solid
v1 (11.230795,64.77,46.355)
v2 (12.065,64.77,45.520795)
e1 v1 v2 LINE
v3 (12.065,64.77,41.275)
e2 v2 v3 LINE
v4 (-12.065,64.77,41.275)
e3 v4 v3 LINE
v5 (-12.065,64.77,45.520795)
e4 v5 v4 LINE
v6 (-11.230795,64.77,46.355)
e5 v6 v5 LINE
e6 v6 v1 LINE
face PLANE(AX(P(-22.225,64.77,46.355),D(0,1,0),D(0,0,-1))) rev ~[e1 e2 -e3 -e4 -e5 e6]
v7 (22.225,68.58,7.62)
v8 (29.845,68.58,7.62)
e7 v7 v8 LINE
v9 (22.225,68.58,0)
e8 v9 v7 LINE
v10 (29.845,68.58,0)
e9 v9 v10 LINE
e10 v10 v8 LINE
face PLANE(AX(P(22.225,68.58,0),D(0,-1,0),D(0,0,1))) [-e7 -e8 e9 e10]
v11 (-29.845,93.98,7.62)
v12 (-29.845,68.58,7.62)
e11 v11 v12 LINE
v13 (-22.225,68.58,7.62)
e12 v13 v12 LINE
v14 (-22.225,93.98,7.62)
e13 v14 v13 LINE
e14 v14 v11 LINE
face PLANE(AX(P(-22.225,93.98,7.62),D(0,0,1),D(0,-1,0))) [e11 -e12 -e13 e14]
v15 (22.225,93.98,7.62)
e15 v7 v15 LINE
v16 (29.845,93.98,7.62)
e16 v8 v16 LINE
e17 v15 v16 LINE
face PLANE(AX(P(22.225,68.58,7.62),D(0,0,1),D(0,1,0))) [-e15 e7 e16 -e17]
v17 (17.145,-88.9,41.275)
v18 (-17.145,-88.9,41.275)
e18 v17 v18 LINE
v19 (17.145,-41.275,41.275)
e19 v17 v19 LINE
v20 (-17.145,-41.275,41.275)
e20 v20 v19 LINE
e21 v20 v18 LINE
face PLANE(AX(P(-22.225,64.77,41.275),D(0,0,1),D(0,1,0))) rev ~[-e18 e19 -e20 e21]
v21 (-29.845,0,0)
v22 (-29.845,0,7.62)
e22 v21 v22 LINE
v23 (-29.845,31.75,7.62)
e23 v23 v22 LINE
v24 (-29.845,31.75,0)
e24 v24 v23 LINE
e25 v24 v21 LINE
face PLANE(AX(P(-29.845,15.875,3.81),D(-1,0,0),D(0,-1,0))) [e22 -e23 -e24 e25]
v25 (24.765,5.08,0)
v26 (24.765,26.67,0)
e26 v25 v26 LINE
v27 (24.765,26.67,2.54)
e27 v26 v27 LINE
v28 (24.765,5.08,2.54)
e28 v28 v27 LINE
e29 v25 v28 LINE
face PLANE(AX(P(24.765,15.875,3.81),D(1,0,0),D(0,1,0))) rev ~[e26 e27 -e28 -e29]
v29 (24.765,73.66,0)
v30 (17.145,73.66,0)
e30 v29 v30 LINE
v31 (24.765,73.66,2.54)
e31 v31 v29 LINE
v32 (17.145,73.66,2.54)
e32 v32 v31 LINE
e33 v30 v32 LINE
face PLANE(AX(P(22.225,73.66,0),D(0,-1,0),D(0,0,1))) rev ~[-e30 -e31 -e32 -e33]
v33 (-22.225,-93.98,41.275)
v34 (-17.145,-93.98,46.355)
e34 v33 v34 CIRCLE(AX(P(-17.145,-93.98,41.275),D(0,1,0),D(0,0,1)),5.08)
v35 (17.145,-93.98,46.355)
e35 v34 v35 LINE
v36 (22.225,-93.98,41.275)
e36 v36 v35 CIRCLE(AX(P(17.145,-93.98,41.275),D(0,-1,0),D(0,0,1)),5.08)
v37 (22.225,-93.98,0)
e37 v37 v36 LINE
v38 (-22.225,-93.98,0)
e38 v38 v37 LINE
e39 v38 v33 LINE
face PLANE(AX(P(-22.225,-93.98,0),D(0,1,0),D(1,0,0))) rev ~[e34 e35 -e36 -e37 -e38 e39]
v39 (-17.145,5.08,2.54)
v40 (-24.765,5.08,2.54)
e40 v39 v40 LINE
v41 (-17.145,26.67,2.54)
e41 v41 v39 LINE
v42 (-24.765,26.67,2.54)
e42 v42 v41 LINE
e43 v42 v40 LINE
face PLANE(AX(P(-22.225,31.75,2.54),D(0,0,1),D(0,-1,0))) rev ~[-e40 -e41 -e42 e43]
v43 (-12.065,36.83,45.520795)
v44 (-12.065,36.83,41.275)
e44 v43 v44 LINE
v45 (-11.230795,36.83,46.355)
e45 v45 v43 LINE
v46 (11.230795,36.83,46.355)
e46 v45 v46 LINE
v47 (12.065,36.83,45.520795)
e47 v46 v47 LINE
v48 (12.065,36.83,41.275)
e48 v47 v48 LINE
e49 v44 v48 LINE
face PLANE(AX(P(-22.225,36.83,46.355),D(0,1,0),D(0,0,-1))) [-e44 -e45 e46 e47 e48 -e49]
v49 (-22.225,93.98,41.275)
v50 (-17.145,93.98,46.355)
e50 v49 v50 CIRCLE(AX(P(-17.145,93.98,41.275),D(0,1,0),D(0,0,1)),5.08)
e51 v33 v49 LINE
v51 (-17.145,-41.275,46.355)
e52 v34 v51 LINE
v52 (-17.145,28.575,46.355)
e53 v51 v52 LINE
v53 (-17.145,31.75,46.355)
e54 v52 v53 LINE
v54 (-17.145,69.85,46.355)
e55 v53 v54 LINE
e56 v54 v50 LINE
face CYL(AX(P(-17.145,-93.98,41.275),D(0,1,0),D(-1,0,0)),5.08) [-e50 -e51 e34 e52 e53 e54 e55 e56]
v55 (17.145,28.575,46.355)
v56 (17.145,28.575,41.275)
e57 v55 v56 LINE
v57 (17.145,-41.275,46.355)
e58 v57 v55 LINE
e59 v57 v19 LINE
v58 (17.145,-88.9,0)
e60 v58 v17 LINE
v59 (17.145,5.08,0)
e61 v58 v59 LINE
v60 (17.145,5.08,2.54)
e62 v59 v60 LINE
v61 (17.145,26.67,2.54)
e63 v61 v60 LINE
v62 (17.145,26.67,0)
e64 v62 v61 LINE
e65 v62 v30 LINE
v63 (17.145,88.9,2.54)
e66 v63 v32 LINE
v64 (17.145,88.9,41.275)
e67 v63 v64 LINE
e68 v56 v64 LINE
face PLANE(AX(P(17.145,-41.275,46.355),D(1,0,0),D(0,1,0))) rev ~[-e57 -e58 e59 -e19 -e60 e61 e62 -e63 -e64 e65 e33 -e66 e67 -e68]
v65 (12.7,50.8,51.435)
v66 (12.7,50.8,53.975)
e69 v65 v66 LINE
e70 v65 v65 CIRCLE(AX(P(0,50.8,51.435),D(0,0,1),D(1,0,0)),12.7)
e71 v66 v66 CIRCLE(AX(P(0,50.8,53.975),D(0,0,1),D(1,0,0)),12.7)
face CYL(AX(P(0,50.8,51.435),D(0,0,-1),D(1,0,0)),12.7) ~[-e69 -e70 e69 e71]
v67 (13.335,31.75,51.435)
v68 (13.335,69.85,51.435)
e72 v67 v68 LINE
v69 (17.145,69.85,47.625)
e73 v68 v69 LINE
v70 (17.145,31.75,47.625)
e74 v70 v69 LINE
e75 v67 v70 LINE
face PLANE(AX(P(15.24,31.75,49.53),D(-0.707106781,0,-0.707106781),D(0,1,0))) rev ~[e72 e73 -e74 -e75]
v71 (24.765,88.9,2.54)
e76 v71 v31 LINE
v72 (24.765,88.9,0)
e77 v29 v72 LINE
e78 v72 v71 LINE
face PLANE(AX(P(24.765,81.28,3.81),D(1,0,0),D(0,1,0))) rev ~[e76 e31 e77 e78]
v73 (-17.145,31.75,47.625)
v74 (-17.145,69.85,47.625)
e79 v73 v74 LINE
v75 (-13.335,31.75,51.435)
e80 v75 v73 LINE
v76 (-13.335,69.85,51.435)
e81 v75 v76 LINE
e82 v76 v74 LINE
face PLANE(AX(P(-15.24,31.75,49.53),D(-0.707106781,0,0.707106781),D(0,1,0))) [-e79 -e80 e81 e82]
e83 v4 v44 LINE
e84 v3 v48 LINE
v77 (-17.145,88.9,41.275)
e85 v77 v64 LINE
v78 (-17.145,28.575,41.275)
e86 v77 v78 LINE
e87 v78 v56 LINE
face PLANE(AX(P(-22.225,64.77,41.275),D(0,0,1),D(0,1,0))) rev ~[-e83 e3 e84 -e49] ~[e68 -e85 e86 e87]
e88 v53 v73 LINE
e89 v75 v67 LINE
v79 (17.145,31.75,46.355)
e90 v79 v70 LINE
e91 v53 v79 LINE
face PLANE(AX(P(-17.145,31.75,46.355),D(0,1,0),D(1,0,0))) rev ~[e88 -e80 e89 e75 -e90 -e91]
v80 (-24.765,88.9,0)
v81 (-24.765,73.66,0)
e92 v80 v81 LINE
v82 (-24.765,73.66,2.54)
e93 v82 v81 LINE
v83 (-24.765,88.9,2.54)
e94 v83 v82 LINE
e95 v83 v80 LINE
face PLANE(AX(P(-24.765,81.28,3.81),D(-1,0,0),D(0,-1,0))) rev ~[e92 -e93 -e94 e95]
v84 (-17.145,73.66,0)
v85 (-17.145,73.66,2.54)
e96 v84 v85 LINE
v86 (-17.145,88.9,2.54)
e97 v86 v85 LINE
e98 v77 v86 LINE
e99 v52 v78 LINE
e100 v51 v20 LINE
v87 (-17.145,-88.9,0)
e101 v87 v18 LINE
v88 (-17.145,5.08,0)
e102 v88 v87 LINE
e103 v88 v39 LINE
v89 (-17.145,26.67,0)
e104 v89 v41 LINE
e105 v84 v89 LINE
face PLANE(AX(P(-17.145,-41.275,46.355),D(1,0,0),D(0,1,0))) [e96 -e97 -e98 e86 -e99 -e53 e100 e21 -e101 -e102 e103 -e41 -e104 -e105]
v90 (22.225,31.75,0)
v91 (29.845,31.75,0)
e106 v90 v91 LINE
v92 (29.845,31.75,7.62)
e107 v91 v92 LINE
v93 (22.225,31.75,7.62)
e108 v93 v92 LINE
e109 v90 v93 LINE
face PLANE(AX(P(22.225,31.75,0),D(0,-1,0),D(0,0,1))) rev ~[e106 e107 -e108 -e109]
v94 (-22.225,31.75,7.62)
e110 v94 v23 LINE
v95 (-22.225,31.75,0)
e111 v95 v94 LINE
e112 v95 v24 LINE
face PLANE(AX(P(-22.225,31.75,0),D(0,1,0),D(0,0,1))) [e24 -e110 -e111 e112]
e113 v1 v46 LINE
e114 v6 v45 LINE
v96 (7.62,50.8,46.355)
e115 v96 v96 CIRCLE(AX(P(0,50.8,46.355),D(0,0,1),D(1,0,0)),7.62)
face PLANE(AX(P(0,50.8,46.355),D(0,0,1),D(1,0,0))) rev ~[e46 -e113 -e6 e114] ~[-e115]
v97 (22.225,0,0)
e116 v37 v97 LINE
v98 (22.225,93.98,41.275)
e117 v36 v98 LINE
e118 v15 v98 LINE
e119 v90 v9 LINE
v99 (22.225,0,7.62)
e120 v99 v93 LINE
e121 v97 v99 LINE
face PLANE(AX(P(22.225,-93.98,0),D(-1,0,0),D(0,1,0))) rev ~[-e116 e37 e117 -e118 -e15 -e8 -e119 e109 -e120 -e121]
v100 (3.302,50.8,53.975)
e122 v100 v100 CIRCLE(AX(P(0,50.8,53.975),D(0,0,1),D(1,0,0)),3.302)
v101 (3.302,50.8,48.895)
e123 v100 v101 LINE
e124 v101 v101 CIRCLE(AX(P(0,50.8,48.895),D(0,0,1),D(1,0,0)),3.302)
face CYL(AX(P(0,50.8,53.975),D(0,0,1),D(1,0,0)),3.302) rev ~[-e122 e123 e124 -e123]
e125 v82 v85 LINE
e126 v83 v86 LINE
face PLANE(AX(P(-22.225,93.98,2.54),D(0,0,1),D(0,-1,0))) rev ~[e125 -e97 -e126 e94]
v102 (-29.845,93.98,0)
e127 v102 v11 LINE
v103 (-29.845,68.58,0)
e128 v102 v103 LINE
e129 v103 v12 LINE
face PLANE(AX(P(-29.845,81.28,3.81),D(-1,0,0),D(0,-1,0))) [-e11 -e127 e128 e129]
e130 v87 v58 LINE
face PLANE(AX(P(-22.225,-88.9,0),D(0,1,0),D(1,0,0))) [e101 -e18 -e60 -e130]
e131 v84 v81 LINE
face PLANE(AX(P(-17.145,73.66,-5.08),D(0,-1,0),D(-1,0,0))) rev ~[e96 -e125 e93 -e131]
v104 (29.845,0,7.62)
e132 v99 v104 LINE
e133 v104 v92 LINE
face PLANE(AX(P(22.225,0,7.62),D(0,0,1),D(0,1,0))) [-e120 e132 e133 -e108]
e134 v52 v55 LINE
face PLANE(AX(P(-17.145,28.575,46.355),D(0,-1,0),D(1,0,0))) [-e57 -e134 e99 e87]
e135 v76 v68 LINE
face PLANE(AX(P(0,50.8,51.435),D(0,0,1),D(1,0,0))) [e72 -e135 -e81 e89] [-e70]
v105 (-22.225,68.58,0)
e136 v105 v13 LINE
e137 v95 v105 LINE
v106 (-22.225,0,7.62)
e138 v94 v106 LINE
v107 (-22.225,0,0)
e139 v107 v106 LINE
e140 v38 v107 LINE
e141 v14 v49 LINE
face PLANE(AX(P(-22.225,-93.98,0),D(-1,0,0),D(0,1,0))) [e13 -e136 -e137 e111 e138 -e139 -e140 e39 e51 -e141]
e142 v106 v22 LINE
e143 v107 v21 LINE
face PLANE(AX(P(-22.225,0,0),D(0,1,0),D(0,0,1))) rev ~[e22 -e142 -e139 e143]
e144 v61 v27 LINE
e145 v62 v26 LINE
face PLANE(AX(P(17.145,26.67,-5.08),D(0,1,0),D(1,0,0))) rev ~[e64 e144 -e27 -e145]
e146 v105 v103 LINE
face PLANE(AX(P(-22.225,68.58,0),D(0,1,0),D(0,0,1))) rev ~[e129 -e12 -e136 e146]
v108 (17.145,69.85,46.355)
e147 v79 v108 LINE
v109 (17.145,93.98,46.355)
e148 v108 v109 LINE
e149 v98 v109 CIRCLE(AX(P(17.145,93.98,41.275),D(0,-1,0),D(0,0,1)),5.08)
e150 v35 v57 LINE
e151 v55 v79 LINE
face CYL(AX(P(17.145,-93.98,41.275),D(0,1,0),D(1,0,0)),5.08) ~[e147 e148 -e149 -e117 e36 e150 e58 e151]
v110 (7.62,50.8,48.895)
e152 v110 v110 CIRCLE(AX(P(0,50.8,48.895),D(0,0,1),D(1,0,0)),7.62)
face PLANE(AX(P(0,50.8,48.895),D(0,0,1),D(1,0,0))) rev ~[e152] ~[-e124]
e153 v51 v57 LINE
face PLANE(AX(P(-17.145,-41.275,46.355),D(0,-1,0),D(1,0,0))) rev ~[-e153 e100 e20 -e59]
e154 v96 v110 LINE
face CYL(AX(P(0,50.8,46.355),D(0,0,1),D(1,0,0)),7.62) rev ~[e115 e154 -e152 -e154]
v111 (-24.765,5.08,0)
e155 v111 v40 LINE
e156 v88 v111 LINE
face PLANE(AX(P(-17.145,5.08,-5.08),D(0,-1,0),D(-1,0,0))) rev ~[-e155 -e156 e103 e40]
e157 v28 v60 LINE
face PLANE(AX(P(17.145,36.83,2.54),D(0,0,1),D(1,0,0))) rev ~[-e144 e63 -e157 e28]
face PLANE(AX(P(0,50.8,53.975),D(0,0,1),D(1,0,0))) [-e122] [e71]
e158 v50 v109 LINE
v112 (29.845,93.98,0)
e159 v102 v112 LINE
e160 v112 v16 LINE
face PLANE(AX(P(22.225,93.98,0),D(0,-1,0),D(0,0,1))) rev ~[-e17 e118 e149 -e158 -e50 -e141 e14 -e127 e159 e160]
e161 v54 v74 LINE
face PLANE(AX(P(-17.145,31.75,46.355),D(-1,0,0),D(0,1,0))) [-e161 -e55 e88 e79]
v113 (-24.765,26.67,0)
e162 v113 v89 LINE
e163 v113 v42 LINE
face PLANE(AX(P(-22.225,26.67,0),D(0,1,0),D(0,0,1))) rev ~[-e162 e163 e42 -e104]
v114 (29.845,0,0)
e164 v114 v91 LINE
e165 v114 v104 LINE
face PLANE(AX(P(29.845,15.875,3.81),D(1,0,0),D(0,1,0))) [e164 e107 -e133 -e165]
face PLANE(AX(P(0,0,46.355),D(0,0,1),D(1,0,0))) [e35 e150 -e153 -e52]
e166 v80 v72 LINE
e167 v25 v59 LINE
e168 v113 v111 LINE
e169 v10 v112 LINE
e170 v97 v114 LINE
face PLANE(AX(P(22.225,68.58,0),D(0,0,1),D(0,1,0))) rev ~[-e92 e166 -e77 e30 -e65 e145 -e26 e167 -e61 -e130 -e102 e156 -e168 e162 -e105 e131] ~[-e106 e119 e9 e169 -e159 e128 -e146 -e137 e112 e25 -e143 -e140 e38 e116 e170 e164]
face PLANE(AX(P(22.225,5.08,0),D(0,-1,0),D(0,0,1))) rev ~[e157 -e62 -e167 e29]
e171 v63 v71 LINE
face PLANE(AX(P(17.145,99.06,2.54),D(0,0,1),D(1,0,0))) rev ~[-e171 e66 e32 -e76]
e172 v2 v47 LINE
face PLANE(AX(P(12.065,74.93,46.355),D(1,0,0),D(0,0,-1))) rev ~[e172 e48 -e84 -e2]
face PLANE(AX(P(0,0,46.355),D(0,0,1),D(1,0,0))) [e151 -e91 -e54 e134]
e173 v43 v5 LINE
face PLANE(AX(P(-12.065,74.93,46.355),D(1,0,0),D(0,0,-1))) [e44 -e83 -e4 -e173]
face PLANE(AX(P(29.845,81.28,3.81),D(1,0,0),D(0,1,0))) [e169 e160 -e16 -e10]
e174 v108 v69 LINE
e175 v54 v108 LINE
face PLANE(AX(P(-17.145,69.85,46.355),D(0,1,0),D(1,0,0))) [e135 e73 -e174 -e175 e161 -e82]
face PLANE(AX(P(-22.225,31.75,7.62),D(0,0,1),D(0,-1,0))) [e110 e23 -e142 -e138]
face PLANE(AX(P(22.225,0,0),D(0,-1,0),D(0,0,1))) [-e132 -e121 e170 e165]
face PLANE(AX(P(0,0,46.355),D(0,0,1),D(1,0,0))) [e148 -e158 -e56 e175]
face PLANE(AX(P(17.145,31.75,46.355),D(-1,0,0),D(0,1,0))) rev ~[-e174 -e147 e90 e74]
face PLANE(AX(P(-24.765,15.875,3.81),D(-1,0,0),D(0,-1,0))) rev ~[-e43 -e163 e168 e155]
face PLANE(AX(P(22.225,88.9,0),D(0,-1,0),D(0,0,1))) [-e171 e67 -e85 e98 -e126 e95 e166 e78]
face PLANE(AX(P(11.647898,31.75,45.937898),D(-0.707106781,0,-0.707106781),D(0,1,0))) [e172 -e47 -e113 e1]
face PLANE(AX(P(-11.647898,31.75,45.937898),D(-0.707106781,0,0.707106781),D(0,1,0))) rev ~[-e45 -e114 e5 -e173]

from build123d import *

# Parameters (mm, degrees)
F0_W          = 44.45
F0_H          = 187.96
F1_DEPTH      = 46.355
F2_R          = 5.08
F3_W          = 34.29
F3_H          = 38.1
F4_DEPTH      = 5.08
F5_R          = 12.7
F6_DEPTH      = 2.54
F7_W          = 31.75
F7_H          = 7.62
F8_DEPTH      = 7.62
F9_W          = 31.75
F9_H          = 7.62
F10_DEPTH     = 7.62
F11_W         = 25.4
F11_H         = 7.62
F12_DEPTH     = 7.62
F13_W         = 25.4
F13_H         = 7.62
F14_DEPTH     = 7.62
F15_SIZE      = 3.81
F16_T         = 5.08
F16_T3_DEPTH  = 44.45
F16_T5_DEPTH  = 48.26
F16_T7_DEPTH  = 35.56
F16_T9_DEPTH  = 17.78
F16_T11_DEPTH = 41.91
F17_W         = 34.29
F17_H         = 69.85
F18_DEPTH     = 25.4
F19_R         = 3.302
F20_DEPTH     = 53.976


# Not quite as in the source:
# - a shell that OpenCascade refuses in one call is made with other operations: the cavity is built on its own and cut out


with BuildPart() as f1:
    # F0 (on Top) → F1 (new body)
    with BuildSketch(Plane.XY):
        Rectangle(F0_W, F0_H)
    extrude(amount=F1_DEPTH)

    # F2
    f2_edges = [f1.edges().sort_by_distance(p)[0] for p in [
        (22.225, 0, 46.355),
        (-22.225, 0, 46.355),
    ]]
    fillet(f2_edges, radius=F2_R)

    # F3 (on face) → F4 (join)
    with BuildSketch(Plane.XY.offset(46.355)):
        with Locations((0, 50.8)):
            Rectangle(F3_W, F3_H)
    extrude(amount=F4_DEPTH)

    # F5 (on face) → F6 (join)
    with BuildSketch(Plane.XY.offset(51.435)):
        with Locations((0, 50.8)):
            Circle(F5_R)
    extrude(amount=F6_DEPTH)

    # F7 (on face) → F8 (join)
    with BuildSketch(Plane.YZ.offset(22.225)):
        with Locations((15.875, 3.81)):
            Rectangle(F7_W, F7_H)
    extrude(amount=F8_DEPTH)

    # F9 (on face) → F10 (join)
    with BuildSketch(Plane(origin=(-22.225, 0, 0), x_dir=(0, -1, 0), z_dir=(-1, 0, 0))):
        with Locations((-15.875, 3.81)):
            Rectangle(F9_W, F9_H)
    extrude(amount=F10_DEPTH)

    # F11 (on face) → F12 (join)
    with BuildSketch(Plane(origin=(-22.225, 0, 0), x_dir=(0, -1, 0), z_dir=(-1, 0, 0))):
        with Locations((-81.28, 3.81)):
            Rectangle(F11_W, F11_H)
    extrude(amount=F12_DEPTH)

    # F13 (on face) → F14 (join)
    with BuildSketch(Plane.YZ.offset(22.225)):
        with Locations((81.28, 3.81)):
            Rectangle(F13_W, F13_H)
    extrude(amount=F14_DEPTH)

    # F15
    f15_edges = [f1.edges().sort_by_distance(p)[0] for p in [
        (-17.145, 50.8, 51.435),
        (17.145, 50.8, 51.435),
    ]]
    chamfer(f15_edges, length=F15_SIZE)

    # F16: shell of thickness 5.08, made by hand


with BuildPart() as f16_core1:
    # F16_t2: copy of F1
    add(f1.part)

    # the walls: a layer under each face that stays
    f16_faces = [f16_core1.faces().sort_by_distance(p)[0] for p in [
        (0, 31.75, 48.895),
        (-17.145, 50.8, 46.99),
        (-15.24, 50.8, 49.53),
        (0, -31.115, 46.355),
        (-8.89, 38.1, 51.435),
        (17.145, 50.8, 46.99),
        (15.24, 50.8, 49.53),
        (0, 69.85, 48.895),
        (0, -93.98, 23.1775),
        (-12.7, 50.8, 52.705),
        (0, 81.915, 46.355),
        (0, 93.98, 23.1775),
        (-22.225, 0, 20.6375),
        (22.225, 0, 20.6375),
        (0, 50.8, 53.975),
        (-26.035, 81.28, 7.62),
        (-29.845, 81.28, 3.81),
        (29.845, 81.28, 3.81),
        (26.035, 81.28, 7.62),
        (-26.035, 68.58, 3.81),
        (-26.035, 31.75, 3.81),
        (-26.035, 15.875, 7.62),
        (-26.035, 0, 3.81),
        (26.035, 0, 3.81),
        (26.035, 15.875, 7.62),
        (26.035, 31.75, 3.81),
        (26.035, 68.58, 3.81),
        (-29.845, 15.875, 3.81),
        (29.845, 15.875, 3.81),
    ]]
    thicken(f16_faces, amount=-F16_T, mode=Mode.SUBTRACT)

    # F16_s4 → F16_t3 (cut)
    with BuildSketch(Plane.YZ.offset(-22.225)):
        Polygon((31.6992, 46.4058), (36.83, 46.355), (36.83, 41.275), (31.75, 41.275), align=None)
        Polygon((69.9008, 46.4058), (64.77, 46.355), (64.77, 41.275), (69.85, 41.275), align=None)
    extrude(amount=F16_T3_DEPTH, mode=Mode.SUBTRACT)

    # F16_s6 → F16_t5 (cut)
    with BuildSketch(Plane.XZ.offset(-74.93)):
        Polygon((-17.1958, 46.4058), (-12.065, 46.355), (-12.065, 41.275), (-17.145, 41.275), align=None)
        Polygon((17.1958, 46.4058), (12.065, 46.355), (12.065, 41.275), (17.145, 41.275), align=None)
    extrude(amount=F16_T5_DEPTH, mode=Mode.SUBTRACT)

    # F16_s8 → F16_t7 (cut)
    with BuildSketch(Plane.XZ.offset(-99.06)):
        Polygon((-22.2758, 7.6708), (-17.145, 7.62), (-17.145, 2.54), (-22.225, 2.54), align=None)
        Polygon((22.2758, 7.6708), (17.145, 7.62), (17.145, 2.54), (22.225, 2.54), align=None)
    extrude(amount=F16_T7_DEPTH, mode=Mode.SUBTRACT)

    # F16_s10 → F16_t9 (cut)
    with BuildSketch(Plane.XY.offset(-5.08)):
        Polygon((-22.2758, 68.5292), (-17.145, 68.58), (-17.145, 73.66), (-22.225, 73.66), align=None)
        Polygon((-22.2758, 31.8008), (-17.145, 31.75), (-17.145, 26.67), (-22.225, 26.67), align=None)
        Polygon((-22.2758, -0.0508), (-17.145, 0), (-17.145, 5.08), (-22.225, 5.08), align=None)
        Polygon((22.2758, -0.0508), (17.145, 0), (17.145, 5.08), (22.225, 5.08), align=None)
        Polygon((22.2758, 31.8008), (17.145, 31.75), (17.145, 26.67), (22.225, 26.67), align=None)
        Polygon((22.2758, 68.5292), (17.145, 68.58), (17.145, 73.66), (22.225, 73.66), align=None)
    extrude(amount=F16_T9_DEPTH, mode=Mode.SUBTRACT)

    # F16_s12 → F16_t11 (cut)
    with BuildSketch(Plane.XZ.offset(-36.83)):
        Polygon((-22.2758, 7.6708), (-17.145, 7.62), (-17.145, 2.54), (-22.225, 2.54), align=None)
        Polygon((22.2758, 7.6708), (17.145, 7.62), (17.145, 2.54), (22.225, 2.54), align=None)
    extrude(amount=F16_T11_DEPTH, mode=Mode.SUBTRACT)

    # F16_s13 → F16_t14 (revolve, cut)
    with BuildSketch(Plane.XZ.offset(-50.8)):
        Polygon((12.7508, 51.4858), (12.7, 46.355), (7.62, 46.355), (7.62, 51.435), align=None)
    revolve(axis=Axis((0, 50.8, 51.435), (0, 0, 1)), mode=Mode.SUBTRACT)


with BuildPart() as f1_1:
    add(f1.part)

    # what is left inside the walls is the cavity
    f16_cavity = [f16_core1.part.solids().sort_by_distance(p)[0] for p in [
        (17.0942, 0, 27.516667),
    ]]
    add(f16_cavity, mode=Mode.SUBTRACT)

    # F17 (on face) → F18 (cut)
    with BuildSketch(Plane.XY.offset(46.355)):
        with Locations((0, -6.35)):
            Rectangle(F17_W, F17_H)
    extrude(amount=-F18_DEPTH, mode=Mode.SUBTRACT)

    # F19 (on face) → F20 (cut, through all)
    with BuildSketch(Plane.XY.offset(53.975)):
        with Locations((0, 50.8)):
            Circle(F19_R)
    extrude(amount=-F20_DEPTH, mode=Mode.SUBTRACT)


solid = f1_1.part
